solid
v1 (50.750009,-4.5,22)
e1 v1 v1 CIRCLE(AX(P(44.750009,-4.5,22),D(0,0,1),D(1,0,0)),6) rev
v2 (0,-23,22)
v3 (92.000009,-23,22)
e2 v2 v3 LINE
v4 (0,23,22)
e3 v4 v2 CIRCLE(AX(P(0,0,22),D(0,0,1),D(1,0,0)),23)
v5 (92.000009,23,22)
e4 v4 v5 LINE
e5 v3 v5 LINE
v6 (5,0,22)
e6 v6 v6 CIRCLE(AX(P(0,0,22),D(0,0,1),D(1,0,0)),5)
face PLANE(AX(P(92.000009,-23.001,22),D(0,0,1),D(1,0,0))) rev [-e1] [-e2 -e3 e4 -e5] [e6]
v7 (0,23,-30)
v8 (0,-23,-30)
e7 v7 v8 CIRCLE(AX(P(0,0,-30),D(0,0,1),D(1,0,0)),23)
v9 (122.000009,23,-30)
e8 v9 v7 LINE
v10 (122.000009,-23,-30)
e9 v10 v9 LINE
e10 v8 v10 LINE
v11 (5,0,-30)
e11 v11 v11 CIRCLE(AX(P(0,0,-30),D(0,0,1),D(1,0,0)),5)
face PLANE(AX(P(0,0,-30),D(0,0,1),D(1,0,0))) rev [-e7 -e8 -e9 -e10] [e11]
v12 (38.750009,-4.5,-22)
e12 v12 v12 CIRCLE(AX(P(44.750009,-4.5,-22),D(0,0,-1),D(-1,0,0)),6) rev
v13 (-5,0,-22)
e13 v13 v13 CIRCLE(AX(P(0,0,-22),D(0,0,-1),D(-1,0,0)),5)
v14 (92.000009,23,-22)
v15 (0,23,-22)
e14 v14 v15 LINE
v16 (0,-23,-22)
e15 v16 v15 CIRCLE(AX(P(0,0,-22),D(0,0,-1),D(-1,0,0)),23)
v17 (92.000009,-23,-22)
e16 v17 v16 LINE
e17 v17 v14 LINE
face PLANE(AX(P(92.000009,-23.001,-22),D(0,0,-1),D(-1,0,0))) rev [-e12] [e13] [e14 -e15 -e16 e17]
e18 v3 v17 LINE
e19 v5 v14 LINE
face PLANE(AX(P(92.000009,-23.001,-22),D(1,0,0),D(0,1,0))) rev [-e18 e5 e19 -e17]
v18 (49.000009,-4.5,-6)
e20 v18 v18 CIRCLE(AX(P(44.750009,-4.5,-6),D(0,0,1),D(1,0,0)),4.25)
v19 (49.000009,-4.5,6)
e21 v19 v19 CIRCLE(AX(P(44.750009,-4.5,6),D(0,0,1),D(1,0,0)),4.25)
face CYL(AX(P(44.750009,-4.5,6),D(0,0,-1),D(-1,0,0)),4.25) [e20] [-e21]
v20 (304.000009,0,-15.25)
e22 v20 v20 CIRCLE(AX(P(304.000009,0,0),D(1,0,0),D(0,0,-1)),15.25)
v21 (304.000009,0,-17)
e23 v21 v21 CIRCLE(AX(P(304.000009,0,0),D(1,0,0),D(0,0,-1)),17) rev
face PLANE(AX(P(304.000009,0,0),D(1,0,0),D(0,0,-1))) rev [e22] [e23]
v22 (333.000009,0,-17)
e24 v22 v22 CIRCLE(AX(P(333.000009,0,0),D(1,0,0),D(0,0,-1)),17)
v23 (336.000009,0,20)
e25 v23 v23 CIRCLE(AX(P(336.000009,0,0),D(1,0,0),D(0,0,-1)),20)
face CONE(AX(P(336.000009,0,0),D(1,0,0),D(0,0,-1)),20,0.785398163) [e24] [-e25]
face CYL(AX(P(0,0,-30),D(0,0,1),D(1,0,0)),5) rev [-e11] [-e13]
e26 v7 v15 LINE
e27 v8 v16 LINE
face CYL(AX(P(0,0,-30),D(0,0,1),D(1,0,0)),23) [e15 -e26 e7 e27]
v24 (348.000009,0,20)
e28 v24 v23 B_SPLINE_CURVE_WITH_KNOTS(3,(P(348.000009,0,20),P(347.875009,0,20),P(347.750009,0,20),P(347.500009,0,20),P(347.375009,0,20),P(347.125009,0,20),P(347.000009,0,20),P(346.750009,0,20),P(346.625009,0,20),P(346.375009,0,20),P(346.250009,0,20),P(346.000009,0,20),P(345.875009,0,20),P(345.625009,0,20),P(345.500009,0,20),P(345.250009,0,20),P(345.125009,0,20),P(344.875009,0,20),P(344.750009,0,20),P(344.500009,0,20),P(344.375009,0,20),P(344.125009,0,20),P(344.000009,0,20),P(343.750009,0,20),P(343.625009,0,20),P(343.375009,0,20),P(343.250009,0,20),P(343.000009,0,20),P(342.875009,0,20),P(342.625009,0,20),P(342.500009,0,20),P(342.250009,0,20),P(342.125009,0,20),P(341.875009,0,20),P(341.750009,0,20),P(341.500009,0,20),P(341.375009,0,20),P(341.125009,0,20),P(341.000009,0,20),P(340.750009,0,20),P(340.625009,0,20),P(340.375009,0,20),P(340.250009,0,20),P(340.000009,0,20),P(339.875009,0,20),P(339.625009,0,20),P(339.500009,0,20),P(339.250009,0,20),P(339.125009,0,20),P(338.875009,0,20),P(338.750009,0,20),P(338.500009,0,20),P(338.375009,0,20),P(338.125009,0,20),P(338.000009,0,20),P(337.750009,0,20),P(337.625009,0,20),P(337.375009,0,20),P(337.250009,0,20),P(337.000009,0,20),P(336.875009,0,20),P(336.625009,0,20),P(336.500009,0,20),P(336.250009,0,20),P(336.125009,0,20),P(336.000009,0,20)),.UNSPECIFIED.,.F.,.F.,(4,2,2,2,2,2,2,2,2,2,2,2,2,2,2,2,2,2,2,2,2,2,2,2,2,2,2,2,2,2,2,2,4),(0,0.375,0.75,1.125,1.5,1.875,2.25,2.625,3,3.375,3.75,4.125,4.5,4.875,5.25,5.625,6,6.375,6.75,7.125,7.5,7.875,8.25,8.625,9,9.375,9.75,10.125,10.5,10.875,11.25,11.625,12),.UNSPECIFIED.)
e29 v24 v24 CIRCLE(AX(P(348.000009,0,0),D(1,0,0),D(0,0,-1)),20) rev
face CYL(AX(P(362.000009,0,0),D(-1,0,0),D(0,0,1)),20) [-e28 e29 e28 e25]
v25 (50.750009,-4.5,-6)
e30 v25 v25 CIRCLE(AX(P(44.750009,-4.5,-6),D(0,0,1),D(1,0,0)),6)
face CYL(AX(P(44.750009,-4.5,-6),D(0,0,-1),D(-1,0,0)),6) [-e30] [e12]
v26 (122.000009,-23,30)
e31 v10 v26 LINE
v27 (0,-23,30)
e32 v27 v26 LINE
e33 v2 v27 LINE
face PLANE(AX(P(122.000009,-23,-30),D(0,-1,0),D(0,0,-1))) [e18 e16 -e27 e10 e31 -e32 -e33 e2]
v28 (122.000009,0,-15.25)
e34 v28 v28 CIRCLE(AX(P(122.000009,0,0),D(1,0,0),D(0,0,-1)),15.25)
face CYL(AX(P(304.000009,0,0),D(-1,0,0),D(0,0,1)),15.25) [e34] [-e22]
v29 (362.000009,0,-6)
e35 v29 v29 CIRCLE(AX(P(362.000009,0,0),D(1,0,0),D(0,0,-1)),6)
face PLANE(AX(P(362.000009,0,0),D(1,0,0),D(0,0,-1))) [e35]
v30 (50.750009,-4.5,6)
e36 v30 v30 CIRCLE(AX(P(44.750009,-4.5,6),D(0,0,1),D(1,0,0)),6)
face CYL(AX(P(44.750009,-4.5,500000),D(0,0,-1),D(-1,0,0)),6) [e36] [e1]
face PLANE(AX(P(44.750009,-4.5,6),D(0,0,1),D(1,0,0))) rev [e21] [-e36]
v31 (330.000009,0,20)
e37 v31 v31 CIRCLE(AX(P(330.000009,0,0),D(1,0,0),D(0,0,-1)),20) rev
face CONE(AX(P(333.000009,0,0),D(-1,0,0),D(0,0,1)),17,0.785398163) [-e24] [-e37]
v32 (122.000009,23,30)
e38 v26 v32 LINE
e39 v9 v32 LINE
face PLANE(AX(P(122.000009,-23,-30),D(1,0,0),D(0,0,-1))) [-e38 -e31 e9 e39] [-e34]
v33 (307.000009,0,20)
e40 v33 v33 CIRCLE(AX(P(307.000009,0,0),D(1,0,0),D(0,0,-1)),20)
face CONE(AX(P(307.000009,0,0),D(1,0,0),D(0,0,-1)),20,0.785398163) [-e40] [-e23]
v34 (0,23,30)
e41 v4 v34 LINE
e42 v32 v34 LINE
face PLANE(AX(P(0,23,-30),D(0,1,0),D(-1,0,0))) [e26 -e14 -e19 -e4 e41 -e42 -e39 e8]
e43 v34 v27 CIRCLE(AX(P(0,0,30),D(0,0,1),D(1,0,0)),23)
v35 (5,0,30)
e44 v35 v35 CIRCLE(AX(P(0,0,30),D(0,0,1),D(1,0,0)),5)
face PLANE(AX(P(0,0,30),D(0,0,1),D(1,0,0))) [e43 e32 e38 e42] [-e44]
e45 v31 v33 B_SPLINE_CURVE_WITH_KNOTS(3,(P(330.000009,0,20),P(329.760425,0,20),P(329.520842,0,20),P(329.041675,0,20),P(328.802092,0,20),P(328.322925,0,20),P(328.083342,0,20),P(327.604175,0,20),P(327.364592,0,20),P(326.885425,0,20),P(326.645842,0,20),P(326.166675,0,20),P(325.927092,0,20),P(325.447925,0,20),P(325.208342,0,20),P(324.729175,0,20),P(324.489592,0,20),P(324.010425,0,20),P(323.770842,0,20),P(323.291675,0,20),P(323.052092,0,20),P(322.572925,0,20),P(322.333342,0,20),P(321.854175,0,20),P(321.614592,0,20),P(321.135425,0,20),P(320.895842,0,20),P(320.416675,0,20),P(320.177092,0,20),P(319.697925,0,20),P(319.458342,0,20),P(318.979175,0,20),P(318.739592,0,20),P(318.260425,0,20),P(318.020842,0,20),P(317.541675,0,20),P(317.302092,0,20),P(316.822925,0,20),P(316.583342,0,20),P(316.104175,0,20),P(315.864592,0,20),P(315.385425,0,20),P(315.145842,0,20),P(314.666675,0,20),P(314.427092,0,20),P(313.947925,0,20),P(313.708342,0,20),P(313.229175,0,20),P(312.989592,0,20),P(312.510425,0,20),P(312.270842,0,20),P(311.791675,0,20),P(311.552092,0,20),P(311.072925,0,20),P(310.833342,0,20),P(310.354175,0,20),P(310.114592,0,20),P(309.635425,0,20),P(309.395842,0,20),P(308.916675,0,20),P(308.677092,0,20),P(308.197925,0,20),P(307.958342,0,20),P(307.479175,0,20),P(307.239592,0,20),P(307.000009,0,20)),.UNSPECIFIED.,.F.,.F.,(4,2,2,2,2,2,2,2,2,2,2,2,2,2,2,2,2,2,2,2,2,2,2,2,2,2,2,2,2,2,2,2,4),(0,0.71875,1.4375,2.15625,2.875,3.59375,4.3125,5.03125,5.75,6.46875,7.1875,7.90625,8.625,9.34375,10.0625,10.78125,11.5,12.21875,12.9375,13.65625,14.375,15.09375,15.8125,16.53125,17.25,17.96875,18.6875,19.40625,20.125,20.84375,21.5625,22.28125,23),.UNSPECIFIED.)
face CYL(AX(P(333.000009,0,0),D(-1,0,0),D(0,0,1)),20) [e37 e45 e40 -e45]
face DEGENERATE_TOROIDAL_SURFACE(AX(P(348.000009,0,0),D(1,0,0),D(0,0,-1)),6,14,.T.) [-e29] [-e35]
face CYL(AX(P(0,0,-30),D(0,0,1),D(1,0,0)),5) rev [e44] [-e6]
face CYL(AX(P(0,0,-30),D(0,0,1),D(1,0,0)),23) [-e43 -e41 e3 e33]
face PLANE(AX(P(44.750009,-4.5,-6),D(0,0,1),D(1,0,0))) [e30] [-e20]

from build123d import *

# Parameters (mm, degrees)
SALIENTE_EXTRUIR1_DEPTH = 60
CORTAR_EXTRUIR1_REACH   = 135.791
CROQUIS3_W              = 115.000008821
CROQUIS3_H              = 44
CROQUIS6_R              = 6
SALIENTE_EXTRUIR4_DEPTH = 16
CROQUIS7_R              = 4.25
SALIENTE_EXTRUIR5_DEPTH = 12
SALIENTE_EXTRUIR6_REACH = 131.263
CROQUIS8_R              = 6
CROQUIS9_R              = 15.25
SALIENTE_EXTRUIR7_DEPTH = 182
CROQUIS10_R             = 20
SALIENTE_EXTRUIR8_DEPTH = 29
CHAFL_N1_SIZE           = 3
CHAFL_N2_SIZE           = 3
CROQUIS11_R             = 20
SALIENTE_EXTRUIR9_DEPTH = 29
CHAFL_N3_SIZE           = 3
REDONDEO1_R             = 14
CROQUIS12_R             = 5
CORTAR_EXTRUIR2_DEPTH   = 368.658817909


with BuildPart() as part:
    # Croquis1 → Saliente-Extruir1 (new body)
    with BuildSketch(Plane.XY.offset(30)):
        with BuildLine():
            Line((122.000008821, -23), (122.000008821, 23))
            Line((122.000008821, 23), (0, 23))
            ThreePointArc((0, 23), (-23, 0), (0, -23))
            Line((0, -23), (122.000008821, -23))
        make_face()
    extrude(amount=-SALIENTE_EXTRUIR1_DEPTH)

    # Croquis3 → Cortar-Extruir1 (cut, up to next)
    with BuildSketch(Plane(origin=(0, 23, 0), x_dir=(1, 0, 0), z_dir=(0, 1, 0)), mode=Mode.PRIVATE) as cortar_extruir1_sk1:
        with Locations((34.500004411, 0)):
            Rectangle(CROQUIS3_W, CROQUIS3_H)
    cortar_extruir1_tool1 = extrude(cortar_extruir1_sk1.sketch, amount=-CORTAR_EXTRUIR1_REACH, mode=Mode.PRIVATE) & part.part
    add(cortar_extruir1_tool1.solids().sort_by_distance((34.500004, 23, 0))[0], mode=Mode.SUBTRACT)

    # Croquis6 → Saliente-Extruir4 (add)
    with BuildSketch(Plane.XY.offset(-22)):
        with Locations(Location((44.750008821, -4.5, 0), (0, 0, 180))):
            Circle(CROQUIS6_R)
    extrude(amount=SALIENTE_EXTRUIR4_DEPTH)

    # Croquis7 → Saliente-Extruir5 (add)
    with BuildSketch(Plane.XY.offset(-6)):
        with Locations((44.750008821, -4.5)):
            Circle(CROQUIS7_R)
    extrude(amount=SALIENTE_EXTRUIR5_DEPTH)

    # Croquis8 → Saliente-Extruir6 (add, up to next)
    with BuildSketch(Plane.XY.offset(6), mode=Mode.PRIVATE) as saliente_extruir6_sk1:
        with Locations(Location((44.750008821, -4.5, 0), (0, 0, 180))):
            Circle(CROQUIS8_R)
    saliente_extruir6_tool1 = extrude(saliente_extruir6_sk1.sketch, amount=SALIENTE_EXTRUIR6_REACH, mode=Mode.PRIVATE) - part.part
    add(saliente_extruir6_tool1.solids().sort_by_distance((44.750009, -4.5, 6))[0])

    # Croquis9 → Saliente-Extruir7 (add)
    with BuildSketch(Plane(origin=(122.000008821, 0, 0), x_dir=(0, 0, -1), z_dir=(1, 0, 0))):
        Circle(CROQUIS9_R)
    extrude(amount=SALIENTE_EXTRUIR7_DEPTH)

    # Croquis10 → Saliente-Extruir8 (add)
    with BuildSketch(Plane(origin=(304.000008821, 0, 0), x_dir=(0, 0, -1), z_dir=(1, 0, 0))):
        with Locations(Location((0, 0, 0), (0, 0, 180))):
            Circle(CROQUIS10_R)
    extrude(amount=SALIENTE_EXTRUIR8_DEPTH)

    # Chaflán1
    chafl_n1_edges = [part.edges().sort_by_distance(p)[0] for p in [
        (304.000008821, 0, -20),
    ]]
    chamfer(chafl_n1_edges, length=CHAFL_N1_SIZE)

    # Chaflán2
    chafl_n2_edges = [part.edges().sort_by_distance(p)[0] for p in [
        (333.000008821, 0, -20),
    ]]
    chamfer(chafl_n2_edges, length=CHAFL_N2_SIZE)

    # Croquis11 → Saliente-Extruir9 (add)
    with BuildSketch(Plane(origin=(333.000008821, 0, 0), x_dir=(0, 0, -1), z_dir=(1, 0, 0))):
        with Locations(Location((0, 0, 0), (0, 0, 180))):
            Circle(CROQUIS11_R)
    extrude(amount=SALIENTE_EXTRUIR9_DEPTH)

    # Chaflán3
    chafl_n3_edges = [part.edges().sort_by_distance(p)[0] for p in [
        (333.000008821, 0, -20),
    ]]
    chamfer(chafl_n3_edges, length=CHAFL_N3_SIZE - 0.0001)  # a hair under: the kernel refuses the full size

    # Redondeo1
    redondeo1_edges = [part.edges().sort_by_distance(p)[0] for p in [
        (362.000008821, 0, -20),
    ]]
    fillet(redondeo1_edges, radius=REDONDEO1_R)

    # Croquis12 → Cortar-Extruir2 (cut, through all)
    with BuildSketch(Plane.XY.offset(30)):
        Circle(CROQUIS12_R)
    extrude(amount=-CORTAR_EXTRUIR2_DEPTH, mode=Mode.SUBTRACT)


solid = part.part
